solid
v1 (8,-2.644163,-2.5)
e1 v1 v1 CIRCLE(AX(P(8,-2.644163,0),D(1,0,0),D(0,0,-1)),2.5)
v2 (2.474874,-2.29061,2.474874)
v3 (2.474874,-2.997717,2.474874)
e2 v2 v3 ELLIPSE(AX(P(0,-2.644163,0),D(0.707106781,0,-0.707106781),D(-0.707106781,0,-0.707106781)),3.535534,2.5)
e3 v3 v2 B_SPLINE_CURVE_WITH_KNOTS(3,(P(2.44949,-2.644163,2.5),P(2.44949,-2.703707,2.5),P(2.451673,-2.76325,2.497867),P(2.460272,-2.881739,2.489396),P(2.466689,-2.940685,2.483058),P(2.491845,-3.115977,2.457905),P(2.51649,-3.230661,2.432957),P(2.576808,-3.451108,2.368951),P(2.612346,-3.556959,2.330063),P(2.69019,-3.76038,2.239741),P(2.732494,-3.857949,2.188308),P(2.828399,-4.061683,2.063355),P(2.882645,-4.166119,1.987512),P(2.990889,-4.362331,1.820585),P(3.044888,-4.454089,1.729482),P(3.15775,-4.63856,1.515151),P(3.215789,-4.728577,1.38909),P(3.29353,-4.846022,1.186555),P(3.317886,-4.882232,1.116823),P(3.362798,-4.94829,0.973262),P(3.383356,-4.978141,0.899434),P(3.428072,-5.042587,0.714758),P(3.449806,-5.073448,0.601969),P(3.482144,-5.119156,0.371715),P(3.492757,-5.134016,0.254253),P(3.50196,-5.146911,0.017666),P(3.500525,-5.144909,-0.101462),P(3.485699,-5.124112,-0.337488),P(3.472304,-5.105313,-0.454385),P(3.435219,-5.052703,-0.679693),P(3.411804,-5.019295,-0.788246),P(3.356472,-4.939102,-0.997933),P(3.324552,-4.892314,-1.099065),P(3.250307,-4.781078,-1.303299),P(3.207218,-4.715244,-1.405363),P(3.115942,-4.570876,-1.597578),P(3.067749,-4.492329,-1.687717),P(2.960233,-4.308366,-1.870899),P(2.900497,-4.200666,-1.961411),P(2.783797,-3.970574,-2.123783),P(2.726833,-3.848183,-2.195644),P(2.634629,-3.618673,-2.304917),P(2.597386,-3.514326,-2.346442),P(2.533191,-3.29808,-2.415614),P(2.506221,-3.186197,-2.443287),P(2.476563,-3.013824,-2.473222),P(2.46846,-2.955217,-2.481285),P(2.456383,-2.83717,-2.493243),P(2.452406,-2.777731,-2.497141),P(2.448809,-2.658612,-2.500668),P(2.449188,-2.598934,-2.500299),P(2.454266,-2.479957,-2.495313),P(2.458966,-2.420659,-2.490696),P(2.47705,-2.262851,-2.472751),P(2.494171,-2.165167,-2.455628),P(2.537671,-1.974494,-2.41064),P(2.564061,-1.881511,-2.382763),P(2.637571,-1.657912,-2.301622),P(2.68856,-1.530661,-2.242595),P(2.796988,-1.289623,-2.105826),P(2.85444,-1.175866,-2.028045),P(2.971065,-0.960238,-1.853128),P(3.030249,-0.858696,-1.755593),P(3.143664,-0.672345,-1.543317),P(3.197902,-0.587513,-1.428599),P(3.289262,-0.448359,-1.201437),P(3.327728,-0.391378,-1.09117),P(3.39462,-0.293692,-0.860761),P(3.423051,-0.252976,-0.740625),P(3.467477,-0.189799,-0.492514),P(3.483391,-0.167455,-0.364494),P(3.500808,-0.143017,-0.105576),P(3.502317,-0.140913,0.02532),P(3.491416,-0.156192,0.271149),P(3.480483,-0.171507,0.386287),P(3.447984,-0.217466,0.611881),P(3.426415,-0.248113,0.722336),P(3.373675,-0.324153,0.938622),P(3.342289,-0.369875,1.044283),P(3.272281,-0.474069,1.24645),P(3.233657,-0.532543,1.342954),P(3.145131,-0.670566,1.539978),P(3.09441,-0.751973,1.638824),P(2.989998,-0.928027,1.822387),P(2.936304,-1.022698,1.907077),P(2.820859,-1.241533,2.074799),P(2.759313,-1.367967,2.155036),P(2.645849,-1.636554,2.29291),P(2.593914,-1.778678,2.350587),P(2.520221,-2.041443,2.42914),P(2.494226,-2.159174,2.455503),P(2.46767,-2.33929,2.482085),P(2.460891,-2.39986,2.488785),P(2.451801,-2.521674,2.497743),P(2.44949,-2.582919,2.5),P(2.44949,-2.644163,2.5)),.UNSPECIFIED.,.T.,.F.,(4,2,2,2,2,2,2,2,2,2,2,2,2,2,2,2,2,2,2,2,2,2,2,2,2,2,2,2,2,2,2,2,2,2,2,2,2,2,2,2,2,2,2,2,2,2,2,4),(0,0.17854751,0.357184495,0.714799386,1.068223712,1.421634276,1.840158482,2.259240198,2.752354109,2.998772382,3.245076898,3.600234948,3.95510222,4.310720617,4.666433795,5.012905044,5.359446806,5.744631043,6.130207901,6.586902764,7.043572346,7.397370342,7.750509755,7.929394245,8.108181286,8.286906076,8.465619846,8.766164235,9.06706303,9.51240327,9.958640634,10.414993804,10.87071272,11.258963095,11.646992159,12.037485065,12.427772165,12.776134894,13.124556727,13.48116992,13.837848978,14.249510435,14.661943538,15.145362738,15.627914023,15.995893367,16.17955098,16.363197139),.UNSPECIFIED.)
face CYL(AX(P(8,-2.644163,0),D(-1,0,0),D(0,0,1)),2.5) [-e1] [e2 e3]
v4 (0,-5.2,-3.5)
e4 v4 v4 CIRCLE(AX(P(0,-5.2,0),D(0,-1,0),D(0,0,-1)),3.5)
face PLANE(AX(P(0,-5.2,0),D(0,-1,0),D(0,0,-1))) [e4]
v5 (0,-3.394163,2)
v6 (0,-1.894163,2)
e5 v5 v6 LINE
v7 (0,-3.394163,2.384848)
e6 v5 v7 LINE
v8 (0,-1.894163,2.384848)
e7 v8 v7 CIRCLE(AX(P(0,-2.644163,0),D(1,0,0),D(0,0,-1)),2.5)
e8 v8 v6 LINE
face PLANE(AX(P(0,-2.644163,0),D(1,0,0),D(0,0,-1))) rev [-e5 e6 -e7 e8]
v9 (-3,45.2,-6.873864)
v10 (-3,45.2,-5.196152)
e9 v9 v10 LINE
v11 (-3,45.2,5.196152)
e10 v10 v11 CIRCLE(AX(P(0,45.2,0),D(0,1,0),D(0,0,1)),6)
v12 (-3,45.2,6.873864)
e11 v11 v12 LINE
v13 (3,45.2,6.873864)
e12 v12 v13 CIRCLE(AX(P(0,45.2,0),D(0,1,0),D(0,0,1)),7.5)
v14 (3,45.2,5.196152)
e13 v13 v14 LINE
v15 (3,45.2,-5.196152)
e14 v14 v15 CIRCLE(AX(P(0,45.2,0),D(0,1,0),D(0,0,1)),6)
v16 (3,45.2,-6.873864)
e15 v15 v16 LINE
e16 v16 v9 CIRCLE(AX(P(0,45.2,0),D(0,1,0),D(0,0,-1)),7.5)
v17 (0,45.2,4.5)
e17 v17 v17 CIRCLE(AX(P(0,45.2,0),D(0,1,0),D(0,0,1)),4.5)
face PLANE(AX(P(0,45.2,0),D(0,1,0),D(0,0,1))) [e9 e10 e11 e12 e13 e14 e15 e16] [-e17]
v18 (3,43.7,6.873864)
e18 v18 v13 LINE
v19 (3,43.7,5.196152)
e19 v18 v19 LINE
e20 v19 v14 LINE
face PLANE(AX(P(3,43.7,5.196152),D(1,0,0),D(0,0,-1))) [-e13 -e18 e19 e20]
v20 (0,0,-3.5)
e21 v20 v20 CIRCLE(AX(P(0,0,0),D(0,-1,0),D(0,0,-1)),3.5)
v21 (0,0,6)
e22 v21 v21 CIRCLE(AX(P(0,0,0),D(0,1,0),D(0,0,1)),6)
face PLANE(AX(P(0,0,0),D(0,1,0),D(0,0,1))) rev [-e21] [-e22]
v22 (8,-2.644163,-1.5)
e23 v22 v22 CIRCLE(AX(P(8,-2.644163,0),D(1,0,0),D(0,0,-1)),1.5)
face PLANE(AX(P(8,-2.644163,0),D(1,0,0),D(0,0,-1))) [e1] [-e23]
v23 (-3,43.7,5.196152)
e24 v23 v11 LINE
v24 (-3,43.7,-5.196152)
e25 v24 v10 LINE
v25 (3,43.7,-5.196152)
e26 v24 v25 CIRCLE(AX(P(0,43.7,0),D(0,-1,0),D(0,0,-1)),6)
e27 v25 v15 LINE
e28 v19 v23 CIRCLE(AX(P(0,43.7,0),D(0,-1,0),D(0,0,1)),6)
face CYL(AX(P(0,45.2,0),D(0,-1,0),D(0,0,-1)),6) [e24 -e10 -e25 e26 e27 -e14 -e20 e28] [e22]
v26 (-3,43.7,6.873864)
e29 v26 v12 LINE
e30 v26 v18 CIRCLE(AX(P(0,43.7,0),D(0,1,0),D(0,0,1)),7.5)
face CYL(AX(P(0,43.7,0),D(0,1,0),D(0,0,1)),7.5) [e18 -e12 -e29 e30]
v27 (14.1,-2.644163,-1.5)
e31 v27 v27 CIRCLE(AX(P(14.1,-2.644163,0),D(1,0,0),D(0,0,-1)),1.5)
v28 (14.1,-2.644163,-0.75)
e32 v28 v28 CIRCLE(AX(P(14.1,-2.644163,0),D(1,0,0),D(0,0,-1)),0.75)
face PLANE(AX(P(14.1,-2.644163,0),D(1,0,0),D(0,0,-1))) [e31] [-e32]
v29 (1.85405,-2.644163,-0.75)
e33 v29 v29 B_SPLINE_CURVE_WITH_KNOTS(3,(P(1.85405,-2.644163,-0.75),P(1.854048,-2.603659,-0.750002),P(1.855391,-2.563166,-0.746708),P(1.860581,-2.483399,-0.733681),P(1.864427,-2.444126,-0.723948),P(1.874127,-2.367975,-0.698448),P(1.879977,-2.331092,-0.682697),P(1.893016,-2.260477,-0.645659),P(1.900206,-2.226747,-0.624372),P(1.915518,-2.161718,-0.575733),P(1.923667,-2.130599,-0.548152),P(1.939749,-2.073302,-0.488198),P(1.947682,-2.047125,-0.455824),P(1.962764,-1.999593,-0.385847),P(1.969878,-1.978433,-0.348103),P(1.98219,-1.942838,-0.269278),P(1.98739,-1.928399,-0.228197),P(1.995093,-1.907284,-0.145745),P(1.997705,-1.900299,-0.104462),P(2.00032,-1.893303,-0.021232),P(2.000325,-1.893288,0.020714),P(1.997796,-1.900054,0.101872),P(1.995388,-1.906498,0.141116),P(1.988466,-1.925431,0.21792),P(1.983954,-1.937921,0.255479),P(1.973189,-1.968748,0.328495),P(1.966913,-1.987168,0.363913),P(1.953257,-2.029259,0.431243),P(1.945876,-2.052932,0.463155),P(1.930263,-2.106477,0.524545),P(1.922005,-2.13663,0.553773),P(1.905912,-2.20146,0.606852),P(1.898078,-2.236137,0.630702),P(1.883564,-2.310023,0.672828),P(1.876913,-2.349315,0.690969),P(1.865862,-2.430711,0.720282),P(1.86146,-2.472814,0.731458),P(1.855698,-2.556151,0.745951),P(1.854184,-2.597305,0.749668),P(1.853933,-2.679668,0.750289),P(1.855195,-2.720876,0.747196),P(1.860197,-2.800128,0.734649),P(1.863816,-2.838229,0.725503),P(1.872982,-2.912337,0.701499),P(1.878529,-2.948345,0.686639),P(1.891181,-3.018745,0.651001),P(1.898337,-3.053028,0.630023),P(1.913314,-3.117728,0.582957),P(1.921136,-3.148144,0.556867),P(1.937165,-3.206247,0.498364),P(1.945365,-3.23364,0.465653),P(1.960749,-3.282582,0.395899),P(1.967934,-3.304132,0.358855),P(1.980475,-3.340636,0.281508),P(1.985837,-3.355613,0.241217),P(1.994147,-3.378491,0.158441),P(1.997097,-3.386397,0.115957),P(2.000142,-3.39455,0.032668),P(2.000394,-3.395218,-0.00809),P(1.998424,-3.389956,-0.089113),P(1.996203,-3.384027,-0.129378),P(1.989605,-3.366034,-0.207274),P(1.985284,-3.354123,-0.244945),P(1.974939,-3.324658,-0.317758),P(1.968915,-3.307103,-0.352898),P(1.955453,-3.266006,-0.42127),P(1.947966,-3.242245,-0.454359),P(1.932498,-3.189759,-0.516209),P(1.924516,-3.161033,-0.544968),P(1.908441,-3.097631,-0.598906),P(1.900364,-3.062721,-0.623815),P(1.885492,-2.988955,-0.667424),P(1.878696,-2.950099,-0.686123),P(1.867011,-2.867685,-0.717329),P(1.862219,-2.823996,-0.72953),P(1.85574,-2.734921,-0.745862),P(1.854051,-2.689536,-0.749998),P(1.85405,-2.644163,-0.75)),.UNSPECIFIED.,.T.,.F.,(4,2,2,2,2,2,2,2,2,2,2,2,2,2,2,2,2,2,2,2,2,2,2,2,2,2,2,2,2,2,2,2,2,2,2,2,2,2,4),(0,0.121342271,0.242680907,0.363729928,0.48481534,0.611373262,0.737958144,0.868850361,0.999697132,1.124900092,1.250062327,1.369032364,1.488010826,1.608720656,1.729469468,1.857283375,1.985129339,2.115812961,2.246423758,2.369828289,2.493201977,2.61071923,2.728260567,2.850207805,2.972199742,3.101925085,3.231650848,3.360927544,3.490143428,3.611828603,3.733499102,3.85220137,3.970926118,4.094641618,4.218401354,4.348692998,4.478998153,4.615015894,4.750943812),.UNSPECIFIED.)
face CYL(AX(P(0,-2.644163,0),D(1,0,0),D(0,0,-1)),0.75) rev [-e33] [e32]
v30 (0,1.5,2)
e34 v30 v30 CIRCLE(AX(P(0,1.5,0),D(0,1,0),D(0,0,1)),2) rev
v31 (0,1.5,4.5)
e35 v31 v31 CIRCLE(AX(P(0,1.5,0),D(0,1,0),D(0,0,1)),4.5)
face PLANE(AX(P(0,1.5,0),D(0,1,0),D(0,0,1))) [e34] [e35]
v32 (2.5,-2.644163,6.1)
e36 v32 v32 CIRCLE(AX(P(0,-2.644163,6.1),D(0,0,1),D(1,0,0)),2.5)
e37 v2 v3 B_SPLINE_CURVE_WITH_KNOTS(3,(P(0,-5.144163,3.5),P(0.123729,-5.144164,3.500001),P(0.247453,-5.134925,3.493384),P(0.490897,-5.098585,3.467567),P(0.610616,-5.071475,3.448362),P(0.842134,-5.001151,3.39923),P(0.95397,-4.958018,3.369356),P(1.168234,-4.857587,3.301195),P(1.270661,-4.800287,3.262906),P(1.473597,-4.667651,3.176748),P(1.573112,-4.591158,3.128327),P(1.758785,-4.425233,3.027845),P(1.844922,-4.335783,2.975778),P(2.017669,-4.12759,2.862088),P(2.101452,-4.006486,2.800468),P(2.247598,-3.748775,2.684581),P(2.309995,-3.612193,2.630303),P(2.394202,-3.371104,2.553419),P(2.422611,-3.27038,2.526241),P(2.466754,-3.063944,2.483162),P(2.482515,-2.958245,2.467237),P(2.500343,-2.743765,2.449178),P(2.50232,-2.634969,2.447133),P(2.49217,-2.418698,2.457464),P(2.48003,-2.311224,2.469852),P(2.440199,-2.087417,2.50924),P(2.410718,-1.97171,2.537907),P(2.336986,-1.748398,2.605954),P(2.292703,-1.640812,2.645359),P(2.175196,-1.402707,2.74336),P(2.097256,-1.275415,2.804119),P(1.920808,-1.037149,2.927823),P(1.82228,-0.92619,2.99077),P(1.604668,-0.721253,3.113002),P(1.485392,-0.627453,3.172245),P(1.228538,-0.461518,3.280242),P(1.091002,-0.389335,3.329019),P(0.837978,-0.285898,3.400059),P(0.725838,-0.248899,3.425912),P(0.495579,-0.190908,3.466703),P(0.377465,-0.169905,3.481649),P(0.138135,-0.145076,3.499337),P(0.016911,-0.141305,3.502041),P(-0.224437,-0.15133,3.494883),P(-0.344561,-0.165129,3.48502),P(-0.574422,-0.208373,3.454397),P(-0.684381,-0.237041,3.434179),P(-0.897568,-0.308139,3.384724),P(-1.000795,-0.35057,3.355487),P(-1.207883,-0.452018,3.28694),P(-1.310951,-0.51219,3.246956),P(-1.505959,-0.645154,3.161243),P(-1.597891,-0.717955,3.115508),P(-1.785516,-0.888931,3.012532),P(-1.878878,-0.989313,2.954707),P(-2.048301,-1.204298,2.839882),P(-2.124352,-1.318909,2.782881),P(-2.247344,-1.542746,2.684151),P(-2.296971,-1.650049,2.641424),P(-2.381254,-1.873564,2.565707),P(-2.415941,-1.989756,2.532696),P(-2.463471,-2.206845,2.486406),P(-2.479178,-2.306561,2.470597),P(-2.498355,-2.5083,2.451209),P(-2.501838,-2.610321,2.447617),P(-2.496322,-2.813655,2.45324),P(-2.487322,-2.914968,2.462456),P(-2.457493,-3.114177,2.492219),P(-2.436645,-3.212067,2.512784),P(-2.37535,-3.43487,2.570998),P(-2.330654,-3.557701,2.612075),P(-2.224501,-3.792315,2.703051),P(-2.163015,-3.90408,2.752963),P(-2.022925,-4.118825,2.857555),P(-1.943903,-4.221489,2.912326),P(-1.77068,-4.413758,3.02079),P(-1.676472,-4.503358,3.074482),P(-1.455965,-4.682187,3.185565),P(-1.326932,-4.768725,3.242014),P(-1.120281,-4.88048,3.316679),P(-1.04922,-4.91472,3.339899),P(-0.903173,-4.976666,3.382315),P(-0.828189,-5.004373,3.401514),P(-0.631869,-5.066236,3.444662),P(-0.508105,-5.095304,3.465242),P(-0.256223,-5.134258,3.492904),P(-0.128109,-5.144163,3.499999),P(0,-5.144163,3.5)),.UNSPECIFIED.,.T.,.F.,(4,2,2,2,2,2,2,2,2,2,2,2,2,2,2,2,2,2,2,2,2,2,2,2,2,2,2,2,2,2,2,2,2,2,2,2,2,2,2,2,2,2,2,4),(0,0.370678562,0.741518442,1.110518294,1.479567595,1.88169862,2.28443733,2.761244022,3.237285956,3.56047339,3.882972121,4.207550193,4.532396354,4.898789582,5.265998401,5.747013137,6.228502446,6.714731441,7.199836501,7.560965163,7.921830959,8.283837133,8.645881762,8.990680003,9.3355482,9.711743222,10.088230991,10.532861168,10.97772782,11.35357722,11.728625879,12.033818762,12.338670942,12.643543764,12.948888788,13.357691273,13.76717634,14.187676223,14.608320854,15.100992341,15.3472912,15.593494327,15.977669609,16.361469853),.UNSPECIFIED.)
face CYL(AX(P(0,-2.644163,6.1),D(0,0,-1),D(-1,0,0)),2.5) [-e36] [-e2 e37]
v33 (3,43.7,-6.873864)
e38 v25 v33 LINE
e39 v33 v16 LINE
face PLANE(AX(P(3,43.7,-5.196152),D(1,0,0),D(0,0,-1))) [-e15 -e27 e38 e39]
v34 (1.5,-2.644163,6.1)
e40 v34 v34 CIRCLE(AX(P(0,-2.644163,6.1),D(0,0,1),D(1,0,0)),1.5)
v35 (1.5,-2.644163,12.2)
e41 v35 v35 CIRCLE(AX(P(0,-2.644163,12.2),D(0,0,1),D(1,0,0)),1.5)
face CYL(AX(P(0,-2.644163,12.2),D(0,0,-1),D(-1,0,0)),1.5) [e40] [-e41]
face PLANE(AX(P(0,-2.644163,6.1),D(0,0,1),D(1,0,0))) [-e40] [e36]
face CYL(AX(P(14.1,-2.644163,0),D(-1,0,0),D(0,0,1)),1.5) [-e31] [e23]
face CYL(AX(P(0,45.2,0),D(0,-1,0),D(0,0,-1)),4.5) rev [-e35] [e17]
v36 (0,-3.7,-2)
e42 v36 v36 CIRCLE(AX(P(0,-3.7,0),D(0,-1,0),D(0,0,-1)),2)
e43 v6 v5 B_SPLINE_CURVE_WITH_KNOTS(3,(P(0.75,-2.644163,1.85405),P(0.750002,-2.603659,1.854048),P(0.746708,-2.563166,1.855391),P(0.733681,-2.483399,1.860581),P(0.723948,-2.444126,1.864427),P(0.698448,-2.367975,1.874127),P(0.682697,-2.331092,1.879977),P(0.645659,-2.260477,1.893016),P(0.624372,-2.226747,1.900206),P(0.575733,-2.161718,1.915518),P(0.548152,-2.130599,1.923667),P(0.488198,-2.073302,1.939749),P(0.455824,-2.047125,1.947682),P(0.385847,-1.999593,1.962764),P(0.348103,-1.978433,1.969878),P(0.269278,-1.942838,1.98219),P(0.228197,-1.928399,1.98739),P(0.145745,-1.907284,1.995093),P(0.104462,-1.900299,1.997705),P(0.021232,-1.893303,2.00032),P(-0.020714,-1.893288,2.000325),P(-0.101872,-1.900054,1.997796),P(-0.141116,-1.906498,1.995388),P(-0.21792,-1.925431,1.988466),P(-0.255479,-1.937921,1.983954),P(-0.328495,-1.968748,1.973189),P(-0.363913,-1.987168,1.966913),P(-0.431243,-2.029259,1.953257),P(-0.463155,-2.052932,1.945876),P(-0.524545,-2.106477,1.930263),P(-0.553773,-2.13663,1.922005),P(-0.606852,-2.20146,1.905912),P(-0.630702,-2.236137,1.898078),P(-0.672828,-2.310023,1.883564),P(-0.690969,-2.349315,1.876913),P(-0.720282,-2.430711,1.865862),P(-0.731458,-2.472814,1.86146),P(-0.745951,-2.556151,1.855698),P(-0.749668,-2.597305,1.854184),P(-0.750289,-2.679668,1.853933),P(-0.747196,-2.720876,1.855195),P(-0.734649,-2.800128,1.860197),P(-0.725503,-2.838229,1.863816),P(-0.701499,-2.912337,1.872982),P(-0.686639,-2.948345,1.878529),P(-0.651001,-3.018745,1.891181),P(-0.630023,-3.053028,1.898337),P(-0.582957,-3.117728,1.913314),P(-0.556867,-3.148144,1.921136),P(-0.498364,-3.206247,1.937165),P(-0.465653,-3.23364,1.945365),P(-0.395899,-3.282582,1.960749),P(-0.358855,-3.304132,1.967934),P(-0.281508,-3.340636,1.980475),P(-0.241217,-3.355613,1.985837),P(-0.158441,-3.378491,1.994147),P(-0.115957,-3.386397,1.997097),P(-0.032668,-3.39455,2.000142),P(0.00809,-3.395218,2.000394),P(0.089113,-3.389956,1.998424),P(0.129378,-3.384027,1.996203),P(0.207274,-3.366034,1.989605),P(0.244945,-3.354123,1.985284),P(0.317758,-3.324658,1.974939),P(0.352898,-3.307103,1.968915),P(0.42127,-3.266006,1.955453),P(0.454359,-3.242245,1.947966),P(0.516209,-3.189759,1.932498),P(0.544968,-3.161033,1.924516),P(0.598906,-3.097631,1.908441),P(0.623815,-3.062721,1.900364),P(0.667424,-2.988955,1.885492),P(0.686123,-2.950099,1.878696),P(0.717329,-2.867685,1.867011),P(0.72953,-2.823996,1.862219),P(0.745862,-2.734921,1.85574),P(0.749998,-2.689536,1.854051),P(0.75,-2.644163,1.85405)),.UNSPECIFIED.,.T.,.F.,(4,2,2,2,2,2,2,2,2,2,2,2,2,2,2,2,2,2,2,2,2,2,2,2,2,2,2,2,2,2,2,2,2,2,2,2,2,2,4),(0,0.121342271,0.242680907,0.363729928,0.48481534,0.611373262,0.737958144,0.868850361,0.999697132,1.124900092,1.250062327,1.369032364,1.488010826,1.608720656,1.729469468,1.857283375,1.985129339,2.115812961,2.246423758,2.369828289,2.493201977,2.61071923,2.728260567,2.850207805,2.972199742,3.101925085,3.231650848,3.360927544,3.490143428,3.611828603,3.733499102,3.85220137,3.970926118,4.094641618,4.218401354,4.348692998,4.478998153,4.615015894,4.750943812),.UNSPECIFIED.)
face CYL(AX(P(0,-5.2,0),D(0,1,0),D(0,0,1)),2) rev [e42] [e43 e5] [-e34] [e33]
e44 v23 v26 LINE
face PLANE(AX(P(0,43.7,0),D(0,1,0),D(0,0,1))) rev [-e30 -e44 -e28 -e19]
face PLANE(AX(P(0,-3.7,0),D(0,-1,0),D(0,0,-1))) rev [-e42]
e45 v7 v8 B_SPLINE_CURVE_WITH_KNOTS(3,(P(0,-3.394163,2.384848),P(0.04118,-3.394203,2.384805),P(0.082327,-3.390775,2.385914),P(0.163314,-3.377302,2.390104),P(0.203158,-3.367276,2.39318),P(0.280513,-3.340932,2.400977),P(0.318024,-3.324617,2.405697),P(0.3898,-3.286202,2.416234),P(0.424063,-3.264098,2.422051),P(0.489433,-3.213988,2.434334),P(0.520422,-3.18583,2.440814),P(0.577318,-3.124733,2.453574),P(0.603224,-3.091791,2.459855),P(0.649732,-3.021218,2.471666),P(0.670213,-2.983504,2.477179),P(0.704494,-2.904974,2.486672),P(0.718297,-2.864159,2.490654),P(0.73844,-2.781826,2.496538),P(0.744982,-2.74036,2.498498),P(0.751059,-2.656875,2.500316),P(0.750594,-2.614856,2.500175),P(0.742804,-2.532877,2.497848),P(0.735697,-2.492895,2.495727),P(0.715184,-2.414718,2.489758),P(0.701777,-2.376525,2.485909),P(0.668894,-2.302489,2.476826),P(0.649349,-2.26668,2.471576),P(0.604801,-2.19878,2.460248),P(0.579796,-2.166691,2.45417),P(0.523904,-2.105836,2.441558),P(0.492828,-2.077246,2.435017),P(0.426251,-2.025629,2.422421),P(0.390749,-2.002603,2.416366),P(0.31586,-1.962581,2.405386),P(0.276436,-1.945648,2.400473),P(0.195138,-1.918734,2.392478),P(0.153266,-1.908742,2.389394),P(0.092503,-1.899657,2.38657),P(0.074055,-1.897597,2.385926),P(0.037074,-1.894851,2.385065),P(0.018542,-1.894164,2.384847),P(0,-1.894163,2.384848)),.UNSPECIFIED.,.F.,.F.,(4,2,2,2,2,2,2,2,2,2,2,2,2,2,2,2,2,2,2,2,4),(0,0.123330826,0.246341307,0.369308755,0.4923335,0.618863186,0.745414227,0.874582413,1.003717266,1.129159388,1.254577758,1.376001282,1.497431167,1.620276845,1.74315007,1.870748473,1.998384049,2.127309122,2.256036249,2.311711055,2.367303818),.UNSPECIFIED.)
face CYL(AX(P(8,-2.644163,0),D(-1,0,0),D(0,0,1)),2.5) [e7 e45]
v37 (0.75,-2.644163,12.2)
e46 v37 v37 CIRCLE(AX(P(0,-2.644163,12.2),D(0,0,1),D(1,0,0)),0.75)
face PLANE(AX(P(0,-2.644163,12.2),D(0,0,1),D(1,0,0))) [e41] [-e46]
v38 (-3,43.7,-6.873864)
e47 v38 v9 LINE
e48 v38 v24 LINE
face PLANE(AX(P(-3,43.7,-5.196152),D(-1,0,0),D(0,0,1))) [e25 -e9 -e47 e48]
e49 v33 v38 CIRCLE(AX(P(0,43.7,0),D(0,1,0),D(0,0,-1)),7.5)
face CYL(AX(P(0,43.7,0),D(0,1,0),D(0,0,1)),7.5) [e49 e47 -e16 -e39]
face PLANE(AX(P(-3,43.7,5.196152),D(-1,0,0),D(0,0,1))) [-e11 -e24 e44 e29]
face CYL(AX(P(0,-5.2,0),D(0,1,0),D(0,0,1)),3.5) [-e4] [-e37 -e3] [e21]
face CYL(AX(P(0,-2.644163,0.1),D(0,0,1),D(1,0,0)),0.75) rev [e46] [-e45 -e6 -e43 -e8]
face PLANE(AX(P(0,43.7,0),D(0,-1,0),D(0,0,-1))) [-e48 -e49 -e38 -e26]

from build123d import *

# Parameters (mm, degrees)
SKETCH1_R           = 6
BOSS_EXTRUDE1_DEPTH = 45.2
SHELL1_T            = -1.5
SKETCH2_R           = 3.5
BOSS_EXTRUDE2_DEPTH = 5.2
SHELL2_START        = -3.7
SHELL2_OUTLINE_R    = 2
SHELL2_DEPTH        = 5.2
SKETCH3_R           = 2.5
BOSS_EXTRUDE3_DEPTH = 6.1
SKETCH4_R           = 1.5
BOSS_EXTRUDE4_DEPTH = 6.1
SKETCH5_R           = 0.75
CUT_EXTRUDE1_DEPTH  = 12.1
SKETCH6_R           = 2
CUT_EXTRUDE2_DEPTH  = 12.1
SKETCH7_R           = 2.5
BOSS_EXTRUDE5_DEPTH = 8
SKETCH8_R           = 1.5
BOSS_EXTRUDE6_DEPTH = 6.1
SKETCH9_R           = 0.75
CUT_EXTRUDE3_DEPTH  = 14.1
SKETCH10_R          = 2
CUT_EXTRUDE4_DEPTH  = 14.1
BOSS_EXTRUDE7_START = -1.5
BOSS_EXTRUDE7_DEPTH = 1.5


# Read off the part's stored shape, not the designer's step: Shell2
with BuildPart() as part:
    # Sketch1 → Boss-Extrude1 (new body)
    with BuildSketch(Plane(origin=(0, 0, 0), x_dir=(1, 0, 0), z_dir=(0, 1, 0))):
        with Locations(Location((0, 0, 0), (0, 0, 270))):
            Circle(SKETCH1_R)
    extrude(amount=BOSS_EXTRUDE1_DEPTH)

    # Shell1
    shell1_openings = [part.faces().sort_by_distance(p)[0] for p in [
        (0, 45.2, 0),
    ]]
    offset(amount=SHELL1_T, openings=shell1_openings, kind=Kind.INTERSECTION)

    # Sketch2 → Boss-Extrude2 (add)
    with BuildSketch(Plane.XZ):
        with Locations(Location((0, 0, 0), (0, 0, 270))):
            Circle(SKETCH2_R)
    extrude(amount=BOSS_EXTRUDE2_DEPTH)

    # Shell2 outline → Shell2 (cut)
    with BuildSketch(Plane(origin=(0, 0, 0), x_dir=(1, 0, 0), z_dir=(0, 1, 0)).offset(SHELL2_START)):
        Circle(SHELL2_OUTLINE_R)
    extrude(amount=SHELL2_DEPTH, mode=Mode.SUBTRACT)

    # Sketch3 → Boss-Extrude3 (add)
    with BuildSketch(Plane.XY):
        with Locations(Location((0, -2.644163182, 0), (0, 0, 270))):
            Circle(SKETCH3_R)
    extrude(amount=BOSS_EXTRUDE3_DEPTH)

    # Sketch4 → Boss-Extrude4 (add)
    with BuildSketch(Plane.XY.offset(6.1)):
        with Locations((0, -2.644163182)):
            Circle(SKETCH4_R)
    extrude(amount=BOSS_EXTRUDE4_DEPTH)

    # Sketch5 → Cut-Extrude1 (cut)
    with BuildSketch(Plane.XY.offset(12.2)):
        with Locations((0, -2.644163182)):
            Circle(SKETCH5_R)
    extrude(amount=-CUT_EXTRUDE1_DEPTH, mode=Mode.SUBTRACT)

    # Sketch6 → Cut-Extrude2 (cut)
    with BuildSketch(Plane(origin=(0, -3.7, 0), x_dir=(1, 0, 0), z_dir=(0, 1, 0))):
        with Locations(Location((0, 0, 0), (0, 0, 270))):
            Circle(SKETCH6_R)
    extrude(amount=CUT_EXTRUDE2_DEPTH, mode=Mode.SUBTRACT)

    # Sketch7 → Boss-Extrude5 (add)
    with BuildSketch(Plane(origin=(0, 0, 0), x_dir=(0, 0, -1), z_dir=(1, 0, 0))):
        with Locations(Location((0, -2.644163182, 0), (0, 0, 188.130102354))):
            Circle(SKETCH7_R)
    extrude(amount=BOSS_EXTRUDE5_DEPTH)

    # Sketch8 → Boss-Extrude6 (add)
    with BuildSketch(Plane(origin=(8, 0, 0), x_dir=(0, 0, -1), z_dir=(1, 0, 0))):
        with Locations((0, -2.644163182)):
            Circle(SKETCH8_R)
    extrude(amount=BOSS_EXTRUDE6_DEPTH)

    # Sketch9 → Cut-Extrude3 (cut)
    with BuildSketch(Plane(origin=(14.1, 0, 0), x_dir=(0, 0, -1), z_dir=(1, 0, 0))):
        with Locations((0, -2.644163182)):
            Circle(SKETCH9_R)
    extrude(amount=-CUT_EXTRUDE3_DEPTH, mode=Mode.SUBTRACT)

    # Sketch10 → Cut-Extrude4 (cut)
    with BuildSketch(Plane(origin=(0, -3.7, 0), x_dir=(1, 0, 0), z_dir=(0, 1, 0))):
        with Locations(Location((0, 0, 0), (0, 0, 270))):
            Circle(SKETCH10_R)
    extrude(amount=CUT_EXTRUDE4_DEPTH, mode=Mode.SUBTRACT)

    # Sketch11 → Boss-Extrude7 (add)
    with BuildSketch(Plane(origin=(0, 45.2, 0), x_dir=(1, 0, 0), z_dir=(0, 1, 0)).offset(BOSS_EXTRUDE7_START)):
        with BuildLine():
            Line((3, -5.196152423), (3, -6.873863542))
            ThreePointArc((3, -6.873863542), (0, -7.5), (-3, -6.873863542))
            Line((-3, -6.873863542), (-3, -5.196152423))
            ThreePointArc((-3, -5.196152423), (0, -6), (3, -5.196152423))
        make_face()
        with BuildLine():
            Line((-3, 5.196152423), (-3, 6.873863542))
            ThreePointArc((-3, 6.873863542), (0, 7.5), (3, 6.873863542))
            Line((3, 6.873863542), (3, 5.196152423))
            ThreePointArc((3, 5.196152423), (0, 6), (-3, 5.196152423))
        make_face()
    extrude(amount=BOSS_EXTRUDE7_DEPTH)


solid = part.part
